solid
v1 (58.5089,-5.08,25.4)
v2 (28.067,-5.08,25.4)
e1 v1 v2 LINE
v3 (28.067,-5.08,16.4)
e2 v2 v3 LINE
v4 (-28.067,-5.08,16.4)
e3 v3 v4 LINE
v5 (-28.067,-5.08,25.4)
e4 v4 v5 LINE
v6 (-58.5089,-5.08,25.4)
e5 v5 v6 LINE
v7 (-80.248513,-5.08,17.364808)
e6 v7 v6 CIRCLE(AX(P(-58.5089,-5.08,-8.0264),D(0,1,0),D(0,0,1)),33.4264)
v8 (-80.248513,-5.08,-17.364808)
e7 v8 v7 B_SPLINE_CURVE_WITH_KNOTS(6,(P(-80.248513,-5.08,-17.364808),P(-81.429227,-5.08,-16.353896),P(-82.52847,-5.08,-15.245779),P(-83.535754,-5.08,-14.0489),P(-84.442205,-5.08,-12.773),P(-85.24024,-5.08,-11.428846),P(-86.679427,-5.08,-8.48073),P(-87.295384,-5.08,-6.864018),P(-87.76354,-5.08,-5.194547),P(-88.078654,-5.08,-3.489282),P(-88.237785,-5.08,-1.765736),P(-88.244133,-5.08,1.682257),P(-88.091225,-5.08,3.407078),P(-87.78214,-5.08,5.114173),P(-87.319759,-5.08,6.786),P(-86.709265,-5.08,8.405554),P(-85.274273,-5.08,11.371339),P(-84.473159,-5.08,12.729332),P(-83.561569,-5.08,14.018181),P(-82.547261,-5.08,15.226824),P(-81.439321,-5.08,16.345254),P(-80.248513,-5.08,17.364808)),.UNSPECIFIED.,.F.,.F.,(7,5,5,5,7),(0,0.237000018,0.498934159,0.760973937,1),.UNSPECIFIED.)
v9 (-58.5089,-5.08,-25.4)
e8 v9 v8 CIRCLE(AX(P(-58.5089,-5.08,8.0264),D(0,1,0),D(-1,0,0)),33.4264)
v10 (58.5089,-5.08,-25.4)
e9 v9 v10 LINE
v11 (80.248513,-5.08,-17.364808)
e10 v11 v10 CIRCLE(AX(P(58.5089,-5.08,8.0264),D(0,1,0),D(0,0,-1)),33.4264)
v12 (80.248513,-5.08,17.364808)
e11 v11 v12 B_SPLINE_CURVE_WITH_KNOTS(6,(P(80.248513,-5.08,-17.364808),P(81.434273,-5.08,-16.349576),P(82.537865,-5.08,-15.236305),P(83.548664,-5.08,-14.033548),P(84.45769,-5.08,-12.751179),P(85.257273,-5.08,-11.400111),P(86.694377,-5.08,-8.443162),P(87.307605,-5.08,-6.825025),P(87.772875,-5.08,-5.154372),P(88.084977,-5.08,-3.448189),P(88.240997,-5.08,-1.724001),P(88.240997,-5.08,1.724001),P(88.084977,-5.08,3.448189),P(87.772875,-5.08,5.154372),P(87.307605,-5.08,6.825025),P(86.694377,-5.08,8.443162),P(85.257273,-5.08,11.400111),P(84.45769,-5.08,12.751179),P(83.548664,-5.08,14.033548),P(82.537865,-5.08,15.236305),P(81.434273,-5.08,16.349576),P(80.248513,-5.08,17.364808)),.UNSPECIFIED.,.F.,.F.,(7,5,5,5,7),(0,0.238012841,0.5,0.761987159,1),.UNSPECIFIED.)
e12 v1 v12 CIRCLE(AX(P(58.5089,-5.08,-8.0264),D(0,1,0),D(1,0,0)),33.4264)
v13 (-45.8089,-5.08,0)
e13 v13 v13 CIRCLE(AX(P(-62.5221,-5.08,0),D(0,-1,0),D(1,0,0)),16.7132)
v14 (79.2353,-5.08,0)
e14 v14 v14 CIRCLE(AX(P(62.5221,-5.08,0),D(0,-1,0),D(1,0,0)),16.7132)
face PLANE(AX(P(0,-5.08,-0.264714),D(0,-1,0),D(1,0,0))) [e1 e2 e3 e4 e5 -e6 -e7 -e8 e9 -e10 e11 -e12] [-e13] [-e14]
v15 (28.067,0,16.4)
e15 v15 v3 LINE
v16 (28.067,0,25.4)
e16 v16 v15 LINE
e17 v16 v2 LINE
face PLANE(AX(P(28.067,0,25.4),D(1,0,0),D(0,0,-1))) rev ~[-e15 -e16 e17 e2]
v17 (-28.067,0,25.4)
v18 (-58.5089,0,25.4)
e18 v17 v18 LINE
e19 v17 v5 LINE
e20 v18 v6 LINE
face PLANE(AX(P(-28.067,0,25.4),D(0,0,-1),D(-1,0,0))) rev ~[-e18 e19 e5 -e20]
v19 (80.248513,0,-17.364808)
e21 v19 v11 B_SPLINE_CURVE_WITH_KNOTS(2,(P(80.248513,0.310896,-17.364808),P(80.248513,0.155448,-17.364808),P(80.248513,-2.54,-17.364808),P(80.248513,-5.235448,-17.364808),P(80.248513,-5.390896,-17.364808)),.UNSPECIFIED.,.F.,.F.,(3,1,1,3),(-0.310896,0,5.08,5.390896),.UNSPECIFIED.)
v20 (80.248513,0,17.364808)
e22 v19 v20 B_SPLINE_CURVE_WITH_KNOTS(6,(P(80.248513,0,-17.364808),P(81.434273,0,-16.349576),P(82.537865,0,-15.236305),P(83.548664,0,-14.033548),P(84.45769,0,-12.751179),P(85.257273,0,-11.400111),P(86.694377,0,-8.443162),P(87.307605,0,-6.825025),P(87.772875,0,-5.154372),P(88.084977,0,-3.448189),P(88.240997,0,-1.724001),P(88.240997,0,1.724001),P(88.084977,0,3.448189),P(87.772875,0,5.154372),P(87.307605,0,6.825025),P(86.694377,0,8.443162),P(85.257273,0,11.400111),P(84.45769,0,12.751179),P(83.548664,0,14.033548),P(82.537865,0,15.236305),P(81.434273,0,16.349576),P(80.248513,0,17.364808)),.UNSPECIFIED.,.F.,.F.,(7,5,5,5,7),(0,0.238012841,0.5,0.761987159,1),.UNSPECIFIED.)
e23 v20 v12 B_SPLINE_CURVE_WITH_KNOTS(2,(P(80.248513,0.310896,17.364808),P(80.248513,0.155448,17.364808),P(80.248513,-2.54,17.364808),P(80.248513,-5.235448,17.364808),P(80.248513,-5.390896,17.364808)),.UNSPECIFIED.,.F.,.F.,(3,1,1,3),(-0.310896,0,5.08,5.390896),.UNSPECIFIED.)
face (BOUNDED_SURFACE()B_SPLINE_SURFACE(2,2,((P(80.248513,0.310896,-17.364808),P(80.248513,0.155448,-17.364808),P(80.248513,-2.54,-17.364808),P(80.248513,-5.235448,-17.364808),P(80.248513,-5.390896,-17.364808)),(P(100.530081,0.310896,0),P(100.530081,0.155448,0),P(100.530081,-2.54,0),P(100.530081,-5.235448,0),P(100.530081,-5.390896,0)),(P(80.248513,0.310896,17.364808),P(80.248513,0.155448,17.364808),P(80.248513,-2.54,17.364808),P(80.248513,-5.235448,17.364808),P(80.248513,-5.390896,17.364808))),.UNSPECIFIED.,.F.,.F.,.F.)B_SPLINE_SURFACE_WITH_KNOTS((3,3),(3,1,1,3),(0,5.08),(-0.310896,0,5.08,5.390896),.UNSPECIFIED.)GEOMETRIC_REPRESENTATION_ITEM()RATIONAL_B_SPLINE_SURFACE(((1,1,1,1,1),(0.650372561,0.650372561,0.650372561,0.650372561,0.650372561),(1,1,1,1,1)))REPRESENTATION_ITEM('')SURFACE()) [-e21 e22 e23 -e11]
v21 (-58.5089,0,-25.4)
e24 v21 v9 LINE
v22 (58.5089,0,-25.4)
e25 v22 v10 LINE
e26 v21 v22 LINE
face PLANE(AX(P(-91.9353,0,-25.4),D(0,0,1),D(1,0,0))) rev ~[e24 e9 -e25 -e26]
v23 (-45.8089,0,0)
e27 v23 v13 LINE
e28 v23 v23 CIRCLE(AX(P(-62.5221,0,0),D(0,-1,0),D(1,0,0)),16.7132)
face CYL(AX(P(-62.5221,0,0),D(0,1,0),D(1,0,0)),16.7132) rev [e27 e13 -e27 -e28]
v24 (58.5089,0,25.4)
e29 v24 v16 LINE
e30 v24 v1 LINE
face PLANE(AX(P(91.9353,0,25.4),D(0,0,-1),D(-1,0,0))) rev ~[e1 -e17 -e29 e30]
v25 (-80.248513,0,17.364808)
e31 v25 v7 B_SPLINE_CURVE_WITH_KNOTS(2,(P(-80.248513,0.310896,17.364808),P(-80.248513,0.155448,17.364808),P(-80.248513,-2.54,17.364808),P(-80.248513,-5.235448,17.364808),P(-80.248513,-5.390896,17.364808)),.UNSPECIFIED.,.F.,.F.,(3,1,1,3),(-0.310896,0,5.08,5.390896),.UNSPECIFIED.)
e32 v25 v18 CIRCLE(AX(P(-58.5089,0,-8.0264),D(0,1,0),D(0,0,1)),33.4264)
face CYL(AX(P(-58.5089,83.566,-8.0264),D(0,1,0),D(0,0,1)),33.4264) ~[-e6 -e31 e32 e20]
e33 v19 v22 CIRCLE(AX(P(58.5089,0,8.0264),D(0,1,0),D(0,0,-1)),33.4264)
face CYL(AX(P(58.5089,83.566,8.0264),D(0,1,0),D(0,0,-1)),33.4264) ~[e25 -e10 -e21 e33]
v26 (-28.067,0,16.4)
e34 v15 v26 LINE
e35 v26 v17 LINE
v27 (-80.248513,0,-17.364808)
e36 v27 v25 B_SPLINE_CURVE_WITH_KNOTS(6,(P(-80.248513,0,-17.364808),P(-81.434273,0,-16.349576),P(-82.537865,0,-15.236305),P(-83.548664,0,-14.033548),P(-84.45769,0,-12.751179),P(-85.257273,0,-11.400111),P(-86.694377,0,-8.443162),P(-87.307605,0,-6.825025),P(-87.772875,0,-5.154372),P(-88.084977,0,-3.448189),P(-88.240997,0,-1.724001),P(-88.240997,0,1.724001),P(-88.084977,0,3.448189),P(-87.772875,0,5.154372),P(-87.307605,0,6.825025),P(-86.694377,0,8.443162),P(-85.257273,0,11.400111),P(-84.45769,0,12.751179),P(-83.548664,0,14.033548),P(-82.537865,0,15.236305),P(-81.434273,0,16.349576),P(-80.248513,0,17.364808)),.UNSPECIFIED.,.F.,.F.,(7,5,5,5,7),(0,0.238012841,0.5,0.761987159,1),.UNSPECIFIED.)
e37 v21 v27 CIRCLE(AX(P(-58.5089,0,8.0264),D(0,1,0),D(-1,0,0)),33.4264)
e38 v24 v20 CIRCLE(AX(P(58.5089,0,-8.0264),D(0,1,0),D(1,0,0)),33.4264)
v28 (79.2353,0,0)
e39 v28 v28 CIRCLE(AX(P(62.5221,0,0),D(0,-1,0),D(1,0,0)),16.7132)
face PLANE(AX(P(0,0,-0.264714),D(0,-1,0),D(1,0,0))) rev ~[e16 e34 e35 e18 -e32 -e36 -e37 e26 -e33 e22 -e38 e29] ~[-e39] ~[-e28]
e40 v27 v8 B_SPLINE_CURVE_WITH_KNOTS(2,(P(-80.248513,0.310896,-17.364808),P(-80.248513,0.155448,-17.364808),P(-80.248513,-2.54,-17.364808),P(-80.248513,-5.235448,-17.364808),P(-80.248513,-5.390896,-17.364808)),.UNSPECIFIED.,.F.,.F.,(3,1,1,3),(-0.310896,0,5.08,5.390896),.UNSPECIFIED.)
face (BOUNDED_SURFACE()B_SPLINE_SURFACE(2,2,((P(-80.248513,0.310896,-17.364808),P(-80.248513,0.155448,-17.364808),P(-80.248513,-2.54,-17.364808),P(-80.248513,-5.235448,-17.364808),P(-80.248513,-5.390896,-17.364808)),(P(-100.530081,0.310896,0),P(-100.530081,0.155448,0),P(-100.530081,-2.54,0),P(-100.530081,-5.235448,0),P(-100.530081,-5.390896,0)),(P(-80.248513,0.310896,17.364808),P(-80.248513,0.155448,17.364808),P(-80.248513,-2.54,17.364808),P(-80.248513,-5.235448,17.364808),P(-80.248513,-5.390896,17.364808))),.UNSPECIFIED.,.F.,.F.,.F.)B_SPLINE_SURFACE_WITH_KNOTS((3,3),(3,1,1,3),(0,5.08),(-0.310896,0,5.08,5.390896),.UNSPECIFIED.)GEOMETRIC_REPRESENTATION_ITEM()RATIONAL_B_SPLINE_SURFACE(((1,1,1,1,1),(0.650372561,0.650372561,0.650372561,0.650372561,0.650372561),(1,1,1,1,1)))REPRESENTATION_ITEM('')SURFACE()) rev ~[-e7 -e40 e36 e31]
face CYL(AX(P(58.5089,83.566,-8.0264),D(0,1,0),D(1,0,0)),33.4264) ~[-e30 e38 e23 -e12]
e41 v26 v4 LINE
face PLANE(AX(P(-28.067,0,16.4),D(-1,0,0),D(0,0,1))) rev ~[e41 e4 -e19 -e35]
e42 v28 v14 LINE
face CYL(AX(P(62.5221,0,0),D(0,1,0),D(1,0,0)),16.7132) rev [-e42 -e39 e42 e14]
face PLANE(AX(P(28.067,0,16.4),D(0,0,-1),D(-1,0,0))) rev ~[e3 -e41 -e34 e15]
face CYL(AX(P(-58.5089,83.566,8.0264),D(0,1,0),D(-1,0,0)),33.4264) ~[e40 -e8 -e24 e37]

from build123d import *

# Parameters (mm, degrees)
F0_R        = 16.7132
F1_DEPTH    = 5.08
F2_T1_DEPTH = 172.212
F3_R        = 22.86
F4_R        = 22.86


# Not quite as in the source:
# - a fillet or chamfer that OpenCascade refuses, or shapes differently, is made with other operations: its cross-section is extruded or revolved along the edge and cut away or added


with BuildPart() as f1:
    # F0 (on Front) → F1 (new body)
    with BuildSketch(Plane.XZ):
        Polygon((-91.9353, -25.4), (91.9353, -25.4), (91.9353, 25.4), (28.067, 25.4), (28.067, 16.4), (-28.067, 16.4), (-28.067, 25.4), (-91.9353, 25.4), align=None)
        with Locations((-62.5221, 0)):
            Circle(F0_R, mode=Mode.SUBTRACT)
        with Locations((62.5221, 0)):
            Circle(F0_R, mode=Mode.SUBTRACT)
    extrude(amount=F1_DEPTH)

    # F2: fillet of radius 33.4264 on 4 edges, made by hand

    # F2_s2 → F2_t1 (cut)
    with BuildSketch(Plane.XZ.offset(-83.566)):
        with BuildLine():
            ThreePointArc((91.9353, -8.0264), (82.1449341107, 15.6096341107), (58.5089, 25.4))
            Line((58.5089, 25.4), (91.9353, 25.4))
            Line((91.9353, 25.4), (91.9353, -8.0264))
        make_face()
        with BuildLine():
            ThreePointArc((58.5089, -25.4), (82.1449341107, -15.6096341107), (91.9353, 8.0264))
            Line((91.9353, 8.0264), (91.9353, -25.4))
            Line((91.9353, -25.4), (58.5089, -25.4))
        make_face()
        with BuildLine():
            ThreePointArc((-58.5089, 25.4), (-82.1449341107, 15.6096341107), (-91.9353, -8.0264))
            Line((-91.9353, -8.0264), (-91.9353, 25.4))
            Line((-91.9353, 25.4), (-58.5089, 25.4))
        make_face()
        with BuildLine():
            ThreePointArc((-91.9353, 8.0264), (-82.1449341107, -15.6096341107), (-58.5089, -25.4))
            Line((-58.5089, -25.4), (-91.9353, -25.4))
            Line((-91.9353, -25.4), (-91.9353, 8.0264))
        make_face()
    extrude(amount=F2_T1_DEPTH, mode=Mode.SUBTRACT)

    # F3
    f3_edges = [f1.edges().sort_by_distance(p)[0] for p in [
        (-90.957338, -2.54, 0),
    ]]
    fillet(f3_edges, radius=F3_R)

    # F4
    f4_edges = [f1.edges().sort_by_distance(p)[0] for p in [
        (90.957338, -2.54, 0),
    ]]
    fillet(f4_edges, radius=F4_R)


solid = f1.part
